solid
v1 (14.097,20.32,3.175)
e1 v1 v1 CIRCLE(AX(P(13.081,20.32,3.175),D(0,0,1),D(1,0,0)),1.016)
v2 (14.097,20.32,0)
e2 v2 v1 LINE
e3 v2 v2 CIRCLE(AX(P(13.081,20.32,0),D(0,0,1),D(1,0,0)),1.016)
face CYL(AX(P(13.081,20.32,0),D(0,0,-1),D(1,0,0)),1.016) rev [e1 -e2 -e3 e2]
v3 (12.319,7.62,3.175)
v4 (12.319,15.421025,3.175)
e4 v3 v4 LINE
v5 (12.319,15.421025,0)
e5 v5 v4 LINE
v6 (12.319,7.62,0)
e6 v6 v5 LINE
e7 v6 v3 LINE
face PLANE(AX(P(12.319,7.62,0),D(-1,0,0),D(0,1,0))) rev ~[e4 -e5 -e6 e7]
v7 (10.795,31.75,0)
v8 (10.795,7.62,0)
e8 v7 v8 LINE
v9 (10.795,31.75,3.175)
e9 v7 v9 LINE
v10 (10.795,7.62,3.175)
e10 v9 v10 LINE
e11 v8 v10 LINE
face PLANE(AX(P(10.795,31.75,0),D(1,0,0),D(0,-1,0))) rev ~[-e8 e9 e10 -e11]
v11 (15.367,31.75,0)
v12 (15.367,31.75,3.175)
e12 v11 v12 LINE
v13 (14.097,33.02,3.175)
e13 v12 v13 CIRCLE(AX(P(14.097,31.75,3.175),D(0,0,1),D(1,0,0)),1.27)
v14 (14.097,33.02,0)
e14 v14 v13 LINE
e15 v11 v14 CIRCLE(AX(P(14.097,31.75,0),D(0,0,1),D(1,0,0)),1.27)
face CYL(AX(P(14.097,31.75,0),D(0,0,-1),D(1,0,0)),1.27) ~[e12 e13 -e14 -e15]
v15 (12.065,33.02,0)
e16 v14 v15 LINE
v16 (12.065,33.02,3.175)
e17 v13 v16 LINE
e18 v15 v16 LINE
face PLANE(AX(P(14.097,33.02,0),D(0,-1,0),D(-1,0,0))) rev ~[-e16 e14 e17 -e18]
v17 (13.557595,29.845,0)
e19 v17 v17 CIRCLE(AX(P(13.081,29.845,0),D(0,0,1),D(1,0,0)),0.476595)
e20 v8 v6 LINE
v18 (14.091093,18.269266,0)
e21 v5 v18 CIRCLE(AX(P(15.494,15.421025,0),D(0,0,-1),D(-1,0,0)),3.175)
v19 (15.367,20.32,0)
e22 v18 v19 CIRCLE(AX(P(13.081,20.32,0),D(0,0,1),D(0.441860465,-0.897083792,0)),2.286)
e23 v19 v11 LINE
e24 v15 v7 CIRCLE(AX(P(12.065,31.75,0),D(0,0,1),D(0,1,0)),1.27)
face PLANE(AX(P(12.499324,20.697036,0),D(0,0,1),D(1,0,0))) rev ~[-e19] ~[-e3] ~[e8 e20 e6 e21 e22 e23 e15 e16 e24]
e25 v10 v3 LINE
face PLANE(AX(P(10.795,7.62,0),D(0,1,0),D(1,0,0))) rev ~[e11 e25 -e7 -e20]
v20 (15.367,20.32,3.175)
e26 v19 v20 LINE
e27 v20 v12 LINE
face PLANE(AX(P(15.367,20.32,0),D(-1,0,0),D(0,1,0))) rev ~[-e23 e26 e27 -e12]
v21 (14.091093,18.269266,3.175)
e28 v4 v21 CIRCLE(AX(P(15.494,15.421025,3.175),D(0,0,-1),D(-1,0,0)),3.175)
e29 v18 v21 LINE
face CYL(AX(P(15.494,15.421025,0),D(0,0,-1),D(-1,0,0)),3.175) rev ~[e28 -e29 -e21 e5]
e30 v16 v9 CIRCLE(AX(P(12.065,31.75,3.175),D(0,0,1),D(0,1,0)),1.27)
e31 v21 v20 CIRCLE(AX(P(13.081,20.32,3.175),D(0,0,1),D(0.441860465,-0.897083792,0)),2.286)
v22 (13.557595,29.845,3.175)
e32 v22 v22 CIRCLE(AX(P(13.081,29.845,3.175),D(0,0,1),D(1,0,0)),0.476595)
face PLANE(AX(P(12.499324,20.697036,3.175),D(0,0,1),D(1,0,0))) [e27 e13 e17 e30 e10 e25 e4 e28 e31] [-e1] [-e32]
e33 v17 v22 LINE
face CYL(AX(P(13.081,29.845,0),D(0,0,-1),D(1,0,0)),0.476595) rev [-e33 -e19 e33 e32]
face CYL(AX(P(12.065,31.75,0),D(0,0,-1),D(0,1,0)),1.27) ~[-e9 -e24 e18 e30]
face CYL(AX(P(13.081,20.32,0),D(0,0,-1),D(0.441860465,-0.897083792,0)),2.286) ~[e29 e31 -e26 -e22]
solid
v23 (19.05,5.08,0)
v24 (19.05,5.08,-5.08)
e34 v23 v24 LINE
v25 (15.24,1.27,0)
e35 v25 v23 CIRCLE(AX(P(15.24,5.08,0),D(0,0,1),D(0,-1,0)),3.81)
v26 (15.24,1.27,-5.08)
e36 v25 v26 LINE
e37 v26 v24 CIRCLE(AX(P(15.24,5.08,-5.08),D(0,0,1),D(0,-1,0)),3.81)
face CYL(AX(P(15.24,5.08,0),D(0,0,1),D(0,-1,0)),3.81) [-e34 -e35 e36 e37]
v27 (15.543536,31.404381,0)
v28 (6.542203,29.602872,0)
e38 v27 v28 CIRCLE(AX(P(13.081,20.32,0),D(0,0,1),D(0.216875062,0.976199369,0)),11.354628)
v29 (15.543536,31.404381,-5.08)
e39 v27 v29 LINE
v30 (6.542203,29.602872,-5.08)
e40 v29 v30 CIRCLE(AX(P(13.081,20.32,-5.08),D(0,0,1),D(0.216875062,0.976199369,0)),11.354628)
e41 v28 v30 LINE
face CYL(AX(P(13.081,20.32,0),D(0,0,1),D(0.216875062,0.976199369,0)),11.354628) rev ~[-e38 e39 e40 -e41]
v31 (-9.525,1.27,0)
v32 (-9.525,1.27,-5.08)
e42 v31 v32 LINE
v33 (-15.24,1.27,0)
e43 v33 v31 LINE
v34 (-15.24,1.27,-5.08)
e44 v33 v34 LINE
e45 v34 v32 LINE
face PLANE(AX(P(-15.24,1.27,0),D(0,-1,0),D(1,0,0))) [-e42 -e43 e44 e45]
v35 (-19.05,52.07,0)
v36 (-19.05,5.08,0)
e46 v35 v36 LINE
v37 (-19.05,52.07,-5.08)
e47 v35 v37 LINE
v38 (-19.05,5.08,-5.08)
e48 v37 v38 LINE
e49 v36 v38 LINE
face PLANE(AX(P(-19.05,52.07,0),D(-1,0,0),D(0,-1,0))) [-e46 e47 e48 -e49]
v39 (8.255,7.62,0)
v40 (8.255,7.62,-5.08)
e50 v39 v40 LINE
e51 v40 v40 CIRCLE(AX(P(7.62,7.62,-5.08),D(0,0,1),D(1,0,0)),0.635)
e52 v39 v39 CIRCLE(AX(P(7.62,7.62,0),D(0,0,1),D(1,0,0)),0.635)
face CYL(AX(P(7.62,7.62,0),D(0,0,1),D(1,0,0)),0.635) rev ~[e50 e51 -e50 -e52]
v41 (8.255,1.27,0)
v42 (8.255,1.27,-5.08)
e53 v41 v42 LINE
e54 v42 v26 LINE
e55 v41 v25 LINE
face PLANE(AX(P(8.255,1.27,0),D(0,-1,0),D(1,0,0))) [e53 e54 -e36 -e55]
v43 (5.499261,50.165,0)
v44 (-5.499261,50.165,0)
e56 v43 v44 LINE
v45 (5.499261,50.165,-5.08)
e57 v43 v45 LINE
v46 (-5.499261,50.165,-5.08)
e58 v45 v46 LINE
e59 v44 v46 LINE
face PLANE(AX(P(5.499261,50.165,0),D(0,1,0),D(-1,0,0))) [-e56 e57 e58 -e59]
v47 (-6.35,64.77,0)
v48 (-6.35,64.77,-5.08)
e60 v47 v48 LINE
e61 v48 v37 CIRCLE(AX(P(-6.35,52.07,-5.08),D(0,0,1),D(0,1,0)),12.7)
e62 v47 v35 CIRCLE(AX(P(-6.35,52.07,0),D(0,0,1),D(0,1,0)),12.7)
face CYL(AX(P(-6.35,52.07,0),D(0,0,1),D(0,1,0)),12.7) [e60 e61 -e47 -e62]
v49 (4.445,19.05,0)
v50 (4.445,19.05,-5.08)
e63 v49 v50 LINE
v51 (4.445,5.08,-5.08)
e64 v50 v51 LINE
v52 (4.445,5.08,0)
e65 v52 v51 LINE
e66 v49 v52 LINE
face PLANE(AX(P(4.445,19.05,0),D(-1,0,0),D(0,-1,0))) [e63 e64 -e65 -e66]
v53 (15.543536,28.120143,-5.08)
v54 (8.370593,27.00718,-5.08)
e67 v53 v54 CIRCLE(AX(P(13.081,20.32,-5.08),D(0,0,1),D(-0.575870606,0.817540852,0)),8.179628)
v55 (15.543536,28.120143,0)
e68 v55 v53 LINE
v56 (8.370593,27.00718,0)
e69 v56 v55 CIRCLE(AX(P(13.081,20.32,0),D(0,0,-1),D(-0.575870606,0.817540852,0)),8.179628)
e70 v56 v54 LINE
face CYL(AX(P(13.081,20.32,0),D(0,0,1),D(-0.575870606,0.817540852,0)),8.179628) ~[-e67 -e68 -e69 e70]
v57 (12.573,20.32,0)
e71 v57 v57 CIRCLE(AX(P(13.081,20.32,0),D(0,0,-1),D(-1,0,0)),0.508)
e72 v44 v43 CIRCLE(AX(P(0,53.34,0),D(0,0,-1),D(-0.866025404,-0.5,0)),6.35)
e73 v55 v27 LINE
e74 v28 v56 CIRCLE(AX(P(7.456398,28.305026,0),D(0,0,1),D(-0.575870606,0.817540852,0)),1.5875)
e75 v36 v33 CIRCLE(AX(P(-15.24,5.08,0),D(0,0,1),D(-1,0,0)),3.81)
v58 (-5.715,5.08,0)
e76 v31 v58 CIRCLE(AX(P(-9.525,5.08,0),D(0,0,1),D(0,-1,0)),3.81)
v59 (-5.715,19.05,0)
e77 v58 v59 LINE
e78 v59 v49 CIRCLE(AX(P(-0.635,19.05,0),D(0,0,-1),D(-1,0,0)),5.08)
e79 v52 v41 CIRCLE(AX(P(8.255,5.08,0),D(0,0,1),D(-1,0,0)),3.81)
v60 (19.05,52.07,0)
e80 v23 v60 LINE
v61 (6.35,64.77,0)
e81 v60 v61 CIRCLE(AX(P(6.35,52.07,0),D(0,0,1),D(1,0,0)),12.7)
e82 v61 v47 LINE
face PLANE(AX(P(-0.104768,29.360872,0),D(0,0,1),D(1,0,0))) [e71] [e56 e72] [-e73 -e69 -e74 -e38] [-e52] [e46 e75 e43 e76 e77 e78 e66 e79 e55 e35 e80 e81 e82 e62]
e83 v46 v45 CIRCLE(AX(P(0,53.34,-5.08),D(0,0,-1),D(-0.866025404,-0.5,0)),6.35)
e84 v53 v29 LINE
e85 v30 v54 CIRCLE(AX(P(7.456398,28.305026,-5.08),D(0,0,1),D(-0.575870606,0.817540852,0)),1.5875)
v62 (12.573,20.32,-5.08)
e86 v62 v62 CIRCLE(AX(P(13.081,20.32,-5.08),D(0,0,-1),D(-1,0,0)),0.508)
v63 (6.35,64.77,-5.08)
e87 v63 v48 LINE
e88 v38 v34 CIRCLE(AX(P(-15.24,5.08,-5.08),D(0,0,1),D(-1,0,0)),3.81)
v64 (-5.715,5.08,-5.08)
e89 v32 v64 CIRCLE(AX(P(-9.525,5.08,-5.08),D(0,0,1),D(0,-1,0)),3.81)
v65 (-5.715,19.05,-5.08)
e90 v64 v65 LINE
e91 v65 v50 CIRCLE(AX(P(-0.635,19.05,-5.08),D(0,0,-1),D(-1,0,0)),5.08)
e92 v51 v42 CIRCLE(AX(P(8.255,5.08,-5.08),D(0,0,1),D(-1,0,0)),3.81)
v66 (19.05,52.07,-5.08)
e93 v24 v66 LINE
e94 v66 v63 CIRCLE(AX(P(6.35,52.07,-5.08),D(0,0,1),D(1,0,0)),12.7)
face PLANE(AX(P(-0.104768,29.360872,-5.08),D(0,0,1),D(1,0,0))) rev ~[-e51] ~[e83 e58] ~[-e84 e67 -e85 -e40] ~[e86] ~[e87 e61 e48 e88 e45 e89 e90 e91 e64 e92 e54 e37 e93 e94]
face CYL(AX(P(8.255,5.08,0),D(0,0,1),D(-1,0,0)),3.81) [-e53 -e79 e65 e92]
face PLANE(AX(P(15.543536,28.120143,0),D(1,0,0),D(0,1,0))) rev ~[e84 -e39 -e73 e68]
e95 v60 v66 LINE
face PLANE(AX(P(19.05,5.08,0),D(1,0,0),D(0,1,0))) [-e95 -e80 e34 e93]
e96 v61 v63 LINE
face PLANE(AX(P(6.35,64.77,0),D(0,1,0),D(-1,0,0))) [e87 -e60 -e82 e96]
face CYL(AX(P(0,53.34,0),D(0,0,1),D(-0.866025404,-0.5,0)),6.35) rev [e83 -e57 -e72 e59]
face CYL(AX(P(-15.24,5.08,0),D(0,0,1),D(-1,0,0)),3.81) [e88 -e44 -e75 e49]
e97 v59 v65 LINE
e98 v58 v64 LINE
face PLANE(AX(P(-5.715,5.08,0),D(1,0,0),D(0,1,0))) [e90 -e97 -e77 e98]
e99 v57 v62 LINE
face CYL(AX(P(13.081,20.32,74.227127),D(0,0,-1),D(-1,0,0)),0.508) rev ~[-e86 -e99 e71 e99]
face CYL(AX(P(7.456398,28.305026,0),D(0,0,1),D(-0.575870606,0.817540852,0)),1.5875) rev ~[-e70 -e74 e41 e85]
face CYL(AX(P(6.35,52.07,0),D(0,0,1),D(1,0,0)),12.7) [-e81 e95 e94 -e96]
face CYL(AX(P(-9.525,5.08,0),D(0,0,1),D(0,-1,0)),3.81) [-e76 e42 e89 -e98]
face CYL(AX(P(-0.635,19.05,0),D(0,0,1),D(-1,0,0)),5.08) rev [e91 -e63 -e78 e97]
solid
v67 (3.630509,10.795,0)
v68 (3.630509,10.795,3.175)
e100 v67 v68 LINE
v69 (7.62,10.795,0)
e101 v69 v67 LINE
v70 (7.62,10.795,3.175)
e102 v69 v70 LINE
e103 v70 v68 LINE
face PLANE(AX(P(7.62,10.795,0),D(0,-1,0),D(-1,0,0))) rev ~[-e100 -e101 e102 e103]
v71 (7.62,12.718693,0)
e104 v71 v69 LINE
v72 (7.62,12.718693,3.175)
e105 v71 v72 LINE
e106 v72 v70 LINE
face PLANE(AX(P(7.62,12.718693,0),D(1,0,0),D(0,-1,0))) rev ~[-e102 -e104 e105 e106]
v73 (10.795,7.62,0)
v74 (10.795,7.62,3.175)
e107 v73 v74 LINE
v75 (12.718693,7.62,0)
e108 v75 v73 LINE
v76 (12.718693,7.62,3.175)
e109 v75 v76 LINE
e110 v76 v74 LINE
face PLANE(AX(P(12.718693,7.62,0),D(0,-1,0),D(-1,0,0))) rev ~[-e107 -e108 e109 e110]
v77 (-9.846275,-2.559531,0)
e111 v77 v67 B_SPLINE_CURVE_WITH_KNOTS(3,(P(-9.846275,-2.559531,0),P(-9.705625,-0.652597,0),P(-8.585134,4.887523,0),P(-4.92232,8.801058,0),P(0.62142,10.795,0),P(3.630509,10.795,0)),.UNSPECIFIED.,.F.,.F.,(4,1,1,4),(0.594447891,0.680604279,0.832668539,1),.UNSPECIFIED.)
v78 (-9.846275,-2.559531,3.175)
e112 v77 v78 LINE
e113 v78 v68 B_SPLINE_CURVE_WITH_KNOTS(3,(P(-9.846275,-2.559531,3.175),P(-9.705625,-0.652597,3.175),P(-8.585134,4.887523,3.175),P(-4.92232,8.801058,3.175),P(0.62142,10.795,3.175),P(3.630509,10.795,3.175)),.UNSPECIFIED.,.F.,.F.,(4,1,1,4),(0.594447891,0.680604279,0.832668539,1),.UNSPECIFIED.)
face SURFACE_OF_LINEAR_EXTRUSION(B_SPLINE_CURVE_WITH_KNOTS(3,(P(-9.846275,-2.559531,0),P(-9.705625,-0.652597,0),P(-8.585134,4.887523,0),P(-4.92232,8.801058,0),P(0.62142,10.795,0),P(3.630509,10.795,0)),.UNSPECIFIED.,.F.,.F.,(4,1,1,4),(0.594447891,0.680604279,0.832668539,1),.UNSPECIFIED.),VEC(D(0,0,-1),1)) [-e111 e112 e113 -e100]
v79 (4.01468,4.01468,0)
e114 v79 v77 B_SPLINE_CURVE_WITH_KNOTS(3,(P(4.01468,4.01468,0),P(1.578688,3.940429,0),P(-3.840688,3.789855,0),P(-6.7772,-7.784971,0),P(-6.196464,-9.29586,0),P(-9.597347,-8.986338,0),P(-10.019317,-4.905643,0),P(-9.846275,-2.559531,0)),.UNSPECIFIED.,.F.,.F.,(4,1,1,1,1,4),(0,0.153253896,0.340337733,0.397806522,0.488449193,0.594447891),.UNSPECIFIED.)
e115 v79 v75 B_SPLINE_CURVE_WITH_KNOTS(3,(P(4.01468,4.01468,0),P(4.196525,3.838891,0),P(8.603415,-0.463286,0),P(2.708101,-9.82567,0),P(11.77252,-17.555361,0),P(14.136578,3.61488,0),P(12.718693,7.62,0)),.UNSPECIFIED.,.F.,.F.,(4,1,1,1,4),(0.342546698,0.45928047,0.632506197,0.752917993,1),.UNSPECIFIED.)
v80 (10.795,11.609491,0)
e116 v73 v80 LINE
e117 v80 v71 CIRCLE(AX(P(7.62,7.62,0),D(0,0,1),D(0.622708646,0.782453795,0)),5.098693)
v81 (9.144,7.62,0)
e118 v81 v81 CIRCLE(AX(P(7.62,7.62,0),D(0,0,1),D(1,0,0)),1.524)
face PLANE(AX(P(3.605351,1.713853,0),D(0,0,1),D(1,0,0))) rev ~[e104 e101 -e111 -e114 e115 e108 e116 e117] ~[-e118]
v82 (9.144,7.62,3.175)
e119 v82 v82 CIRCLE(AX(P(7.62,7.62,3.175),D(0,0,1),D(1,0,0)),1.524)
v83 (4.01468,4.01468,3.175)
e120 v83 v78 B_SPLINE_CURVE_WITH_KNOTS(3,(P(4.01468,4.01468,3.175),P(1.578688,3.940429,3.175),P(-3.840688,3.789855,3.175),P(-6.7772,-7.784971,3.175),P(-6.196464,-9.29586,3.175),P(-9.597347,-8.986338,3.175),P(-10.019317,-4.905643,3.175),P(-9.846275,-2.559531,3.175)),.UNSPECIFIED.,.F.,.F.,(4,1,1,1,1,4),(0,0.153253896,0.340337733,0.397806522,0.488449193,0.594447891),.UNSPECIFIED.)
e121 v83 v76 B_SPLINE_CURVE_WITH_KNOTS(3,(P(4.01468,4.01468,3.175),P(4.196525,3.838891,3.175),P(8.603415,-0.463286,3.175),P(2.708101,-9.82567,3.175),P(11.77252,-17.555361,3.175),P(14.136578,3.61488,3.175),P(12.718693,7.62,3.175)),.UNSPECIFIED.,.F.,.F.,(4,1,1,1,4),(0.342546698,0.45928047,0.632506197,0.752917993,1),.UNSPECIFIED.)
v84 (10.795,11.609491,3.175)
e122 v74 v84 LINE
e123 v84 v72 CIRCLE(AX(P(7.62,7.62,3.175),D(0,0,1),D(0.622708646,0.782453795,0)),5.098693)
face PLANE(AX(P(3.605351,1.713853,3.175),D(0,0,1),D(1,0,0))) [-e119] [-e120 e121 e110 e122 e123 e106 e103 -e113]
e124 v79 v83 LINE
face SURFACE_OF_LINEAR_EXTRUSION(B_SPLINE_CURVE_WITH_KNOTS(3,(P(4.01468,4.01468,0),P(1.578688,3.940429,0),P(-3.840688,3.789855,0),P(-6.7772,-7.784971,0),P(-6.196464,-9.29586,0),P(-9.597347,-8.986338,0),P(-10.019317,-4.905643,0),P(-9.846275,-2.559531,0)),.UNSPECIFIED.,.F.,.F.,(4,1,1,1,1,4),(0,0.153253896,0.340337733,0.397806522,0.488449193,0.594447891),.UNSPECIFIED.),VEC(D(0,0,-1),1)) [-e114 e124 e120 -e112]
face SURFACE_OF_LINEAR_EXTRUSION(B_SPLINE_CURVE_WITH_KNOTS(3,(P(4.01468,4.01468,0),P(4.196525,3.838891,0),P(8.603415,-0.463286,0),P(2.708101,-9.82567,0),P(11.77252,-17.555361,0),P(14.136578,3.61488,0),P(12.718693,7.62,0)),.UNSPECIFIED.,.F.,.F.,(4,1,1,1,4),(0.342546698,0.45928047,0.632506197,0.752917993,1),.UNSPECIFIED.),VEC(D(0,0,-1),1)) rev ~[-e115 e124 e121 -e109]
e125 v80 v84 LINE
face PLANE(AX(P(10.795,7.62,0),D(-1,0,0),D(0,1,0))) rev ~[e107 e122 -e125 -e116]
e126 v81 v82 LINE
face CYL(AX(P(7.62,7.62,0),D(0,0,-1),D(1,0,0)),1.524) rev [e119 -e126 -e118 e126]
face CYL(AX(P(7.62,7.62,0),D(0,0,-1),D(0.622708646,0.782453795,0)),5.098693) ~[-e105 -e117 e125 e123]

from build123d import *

# Parameters (mm, degrees)
F0_R     = 1.524
F1_DEPTH = 3.175
F2_R     = 0.635
F3_DEPTH = 5.08
F4_R     = 1.016
F4_R_2   = 0.4765946888
F5_DEPTH = 3.175
F6_D     = 1.016
F8_DEPTH = 25.4


with BuildPart() as f1:
    # F0 (on Top) → F1 (new body)
    with BuildSketch(Plane.XY):
        with BuildLine():
            add(Edge.make_bspline(
                [(4.0146798487, 4.0146798487), (4.1965253446, 3.8388911287), (8.6034145204, -0.4632855785), (2.7081005667, -9.8256704348), (11.7725199973, -17.5553609081), (14.1365779009, 3.6148799922), (12.7186926547, 7.62)],
                knots=[0.342546698, 0.342546698, 0.342546698, 0.342546698, 0.4592804701, 0.6325061967, 0.7529179928, 1, 1, 1, 1], degree=3))
            Line((12.7186926547, 7.62), (10.795, 7.62))
            Line((10.795, 7.62), (10.795, 11.6094914196))
            ThreePointArc((10.795, 11.6094914196), (9.3015879683, 12.4334113363), (7.62, 12.7186926547))
            Line((7.62, 12.7186926547), (7.62, 10.795))
            Line((7.62, 10.795), (3.6305085804, 10.795))
            add(Edge.make_bspline(
                [(-9.8462747246, -2.5595309993), (-9.7056248656, -0.6525965961), (-8.5851336869, 4.887523046), (-4.9223199156, 8.8010582074), (0.6214204647, 10.795), (3.6305085804, 10.795)],
                knots=[0.5944478908, 0.5944478908, 0.5944478908, 0.5944478908, 0.6806042793, 0.8326685389, 1, 1, 1, 1], degree=3))
            add(Edge.make_bspline(
                [(-9.8462747246, -2.5595309993), (-8.3692950914, 1.0159390836), (-1.2709087492, 7.2679963496), (3.9839462531, 4.0422517138), (3.9949946041, 4.0337094316), (4.0146798487, 4.0146798487)],
                knots=[0.0522687231, 0.0522687231, 0.0522687231, 0.0522687231, 0.2064144516, 0.3299099657, 0.342546698, 0.342546698, 0.342546698, 0.342546698], degree=3))
        make_face()
        with Locations((7.62, 7.62)):
            Circle(F0_R, mode=Mode.SUBTRACT)
        with BuildLine():
            add(Edge.make_bspline(
                [(4.0146798487, 4.0146798487), (1.5786877312, 3.9404286991), (-3.8406877482, 3.7898553775), (-6.77720019, -7.7849709454), (-6.196463978, -9.2958597248), (-9.5973471823, -8.9863377062), (-10.0193170502, -4.9056432962), (-9.8462747246, -2.5595309993)],
                knots=[0, 0, 0, 0, 0.1532538956, 0.3403377332, 0.3978065221, 0.4884491935, 0.5944478908, 0.5944478908, 0.5944478908, 0.5944478908], degree=3))
            add(Edge.make_bspline(
                [(-9.8462747246, -2.5595309993), (-8.3692950914, 1.0159390836), (-1.2709087492, 7.2679963496), (3.9839462531, 4.0422517138), (3.9949946041, 4.0337094316), (4.0146798487, 4.0146798487)],
                knots=[0.0522687231, 0.0522687231, 0.0522687231, 0.0522687231, 0.2064144516, 0.3299099657, 0.342546698, 0.342546698, 0.342546698, 0.342546698], degree=3))
        make_face()
    extrude(amount=F1_DEPTH)


with BuildPart() as f3:
    # F2 (on Top) → F3 (new body)
    with BuildSketch(Plane.XY):
        with BuildLine():
            Line((6.35, 64.77), (-6.35, 64.77))
            ThreePointArc((-6.35, 64.77), (-15.3302561211, 61.0502561211), (-19.05, 52.07))
            Line((-19.05, 52.07), (-19.05, 5.08))
            ThreePointArc((-19.05, 5.08), (-17.9340768363, 2.3859231637), (-15.24, 1.27))
            Line((-15.24, 1.27), (-9.525, 1.27))
            ThreePointArc((-9.525, 1.27), (-6.8309231637, 2.3859231637), (-5.715, 5.08))
            Line((-5.715, 5.08), (-5.715, 19.05))
            ThreePointArc((-5.715, 19.05), (-0.635, 24.13), (4.445, 19.05))
            Line((4.445, 19.05), (4.445, 5.08))
            ThreePointArc((4.445, 5.08), (5.5609231637, 2.3859231637), (8.255, 1.27))
            Line((8.255, 1.27), (15.24, 1.27))
            ThreePointArc((15.24, 1.27), (17.9340768363, 2.3859231637), (19.05, 5.08))
            Line((19.05, 5.08), (19.05, 52.07))
            ThreePointArc((19.05, 52.07), (15.3302561211, 61.0502561211), (6.35, 64.77))
        make_face()
        with Locations((7.62, 7.62)):
            Circle(F2_R, mode=Mode.SUBTRACT)
        with BuildLine():
            ThreePointArc((-5.499261314, 50.165), (0, 59.69), (5.499261314, 50.165))
            Line((5.499261314, 50.165), (-5.499261314, 50.165))
        make_face(mode=Mode.SUBTRACT)
    extrude(amount=-F3_DEPTH)

    # F6 (through all)
    with Locations(Plane.XY):
        with Locations((13.081, 20.32)):
            Hole(F6_D / 2)

    # F7 (on face) → F8 (cut)
    with BuildSketch(Plane.XY):
        with BuildLine():
            Line((15.5435356842, 28.1201432546), (15.5435356842, 31.4043808392))
            ThreePointArc((15.5435356842, 31.4043808392), (10.8526970709, 31.4538334208), (6.542203401, 29.6028723799))
            ThreePointArc((6.542203401, 29.6028723799), (6.1585518853, 27.3908316899), (8.3705925754, 27.0071801742))
            ThreePointArc((8.3705925754, 27.0071801742), (11.826845486, 28.4029087118), (15.5435356842, 28.1201432546))
        make_face()
    extrude(amount=-F8_DEPTH, mode=Mode.SUBTRACT)


with BuildPart() as f5:
    # F4 (on face) → F5 (new body)
    with BuildSketch(Plane.XY):
        with BuildLine():
            Line((10.795, 31.75), (10.795, 7.62))
            Line((10.795, 7.62), (12.319, 7.62))
            Line((12.319, 7.62), (12.319, 15.4210254134))
            ThreePointArc((12.319, 15.4210254134), (12.7981833657, 17.09828439), (14.0910930233, 18.2692664521))
            ThreePointArc((14.0910930233, 18.2692664521), (15.0219879767, 19.1123735369), (15.367, 20.32))
            Line((15.367, 20.32), (15.367, 31.75))
            ThreePointArc((15.367, 31.75), (14.9950256121, 32.6480256121), (14.097, 33.02))
            Line((14.097, 33.02), (12.065, 33.02))
            ThreePointArc((12.065, 33.02), (11.1669743879, 32.6480256121), (10.795, 31.75))
        make_face()
        with Locations((13.081, 20.32)):
            Circle(F4_R, mode=Mode.SUBTRACT)
        with Locations((13.081, 29.845)):
            Circle(F4_R_2, mode=Mode.SUBTRACT)
    extrude(amount=F5_DEPTH)


solid = Compound([f1.part, f3.part, f5.part])
